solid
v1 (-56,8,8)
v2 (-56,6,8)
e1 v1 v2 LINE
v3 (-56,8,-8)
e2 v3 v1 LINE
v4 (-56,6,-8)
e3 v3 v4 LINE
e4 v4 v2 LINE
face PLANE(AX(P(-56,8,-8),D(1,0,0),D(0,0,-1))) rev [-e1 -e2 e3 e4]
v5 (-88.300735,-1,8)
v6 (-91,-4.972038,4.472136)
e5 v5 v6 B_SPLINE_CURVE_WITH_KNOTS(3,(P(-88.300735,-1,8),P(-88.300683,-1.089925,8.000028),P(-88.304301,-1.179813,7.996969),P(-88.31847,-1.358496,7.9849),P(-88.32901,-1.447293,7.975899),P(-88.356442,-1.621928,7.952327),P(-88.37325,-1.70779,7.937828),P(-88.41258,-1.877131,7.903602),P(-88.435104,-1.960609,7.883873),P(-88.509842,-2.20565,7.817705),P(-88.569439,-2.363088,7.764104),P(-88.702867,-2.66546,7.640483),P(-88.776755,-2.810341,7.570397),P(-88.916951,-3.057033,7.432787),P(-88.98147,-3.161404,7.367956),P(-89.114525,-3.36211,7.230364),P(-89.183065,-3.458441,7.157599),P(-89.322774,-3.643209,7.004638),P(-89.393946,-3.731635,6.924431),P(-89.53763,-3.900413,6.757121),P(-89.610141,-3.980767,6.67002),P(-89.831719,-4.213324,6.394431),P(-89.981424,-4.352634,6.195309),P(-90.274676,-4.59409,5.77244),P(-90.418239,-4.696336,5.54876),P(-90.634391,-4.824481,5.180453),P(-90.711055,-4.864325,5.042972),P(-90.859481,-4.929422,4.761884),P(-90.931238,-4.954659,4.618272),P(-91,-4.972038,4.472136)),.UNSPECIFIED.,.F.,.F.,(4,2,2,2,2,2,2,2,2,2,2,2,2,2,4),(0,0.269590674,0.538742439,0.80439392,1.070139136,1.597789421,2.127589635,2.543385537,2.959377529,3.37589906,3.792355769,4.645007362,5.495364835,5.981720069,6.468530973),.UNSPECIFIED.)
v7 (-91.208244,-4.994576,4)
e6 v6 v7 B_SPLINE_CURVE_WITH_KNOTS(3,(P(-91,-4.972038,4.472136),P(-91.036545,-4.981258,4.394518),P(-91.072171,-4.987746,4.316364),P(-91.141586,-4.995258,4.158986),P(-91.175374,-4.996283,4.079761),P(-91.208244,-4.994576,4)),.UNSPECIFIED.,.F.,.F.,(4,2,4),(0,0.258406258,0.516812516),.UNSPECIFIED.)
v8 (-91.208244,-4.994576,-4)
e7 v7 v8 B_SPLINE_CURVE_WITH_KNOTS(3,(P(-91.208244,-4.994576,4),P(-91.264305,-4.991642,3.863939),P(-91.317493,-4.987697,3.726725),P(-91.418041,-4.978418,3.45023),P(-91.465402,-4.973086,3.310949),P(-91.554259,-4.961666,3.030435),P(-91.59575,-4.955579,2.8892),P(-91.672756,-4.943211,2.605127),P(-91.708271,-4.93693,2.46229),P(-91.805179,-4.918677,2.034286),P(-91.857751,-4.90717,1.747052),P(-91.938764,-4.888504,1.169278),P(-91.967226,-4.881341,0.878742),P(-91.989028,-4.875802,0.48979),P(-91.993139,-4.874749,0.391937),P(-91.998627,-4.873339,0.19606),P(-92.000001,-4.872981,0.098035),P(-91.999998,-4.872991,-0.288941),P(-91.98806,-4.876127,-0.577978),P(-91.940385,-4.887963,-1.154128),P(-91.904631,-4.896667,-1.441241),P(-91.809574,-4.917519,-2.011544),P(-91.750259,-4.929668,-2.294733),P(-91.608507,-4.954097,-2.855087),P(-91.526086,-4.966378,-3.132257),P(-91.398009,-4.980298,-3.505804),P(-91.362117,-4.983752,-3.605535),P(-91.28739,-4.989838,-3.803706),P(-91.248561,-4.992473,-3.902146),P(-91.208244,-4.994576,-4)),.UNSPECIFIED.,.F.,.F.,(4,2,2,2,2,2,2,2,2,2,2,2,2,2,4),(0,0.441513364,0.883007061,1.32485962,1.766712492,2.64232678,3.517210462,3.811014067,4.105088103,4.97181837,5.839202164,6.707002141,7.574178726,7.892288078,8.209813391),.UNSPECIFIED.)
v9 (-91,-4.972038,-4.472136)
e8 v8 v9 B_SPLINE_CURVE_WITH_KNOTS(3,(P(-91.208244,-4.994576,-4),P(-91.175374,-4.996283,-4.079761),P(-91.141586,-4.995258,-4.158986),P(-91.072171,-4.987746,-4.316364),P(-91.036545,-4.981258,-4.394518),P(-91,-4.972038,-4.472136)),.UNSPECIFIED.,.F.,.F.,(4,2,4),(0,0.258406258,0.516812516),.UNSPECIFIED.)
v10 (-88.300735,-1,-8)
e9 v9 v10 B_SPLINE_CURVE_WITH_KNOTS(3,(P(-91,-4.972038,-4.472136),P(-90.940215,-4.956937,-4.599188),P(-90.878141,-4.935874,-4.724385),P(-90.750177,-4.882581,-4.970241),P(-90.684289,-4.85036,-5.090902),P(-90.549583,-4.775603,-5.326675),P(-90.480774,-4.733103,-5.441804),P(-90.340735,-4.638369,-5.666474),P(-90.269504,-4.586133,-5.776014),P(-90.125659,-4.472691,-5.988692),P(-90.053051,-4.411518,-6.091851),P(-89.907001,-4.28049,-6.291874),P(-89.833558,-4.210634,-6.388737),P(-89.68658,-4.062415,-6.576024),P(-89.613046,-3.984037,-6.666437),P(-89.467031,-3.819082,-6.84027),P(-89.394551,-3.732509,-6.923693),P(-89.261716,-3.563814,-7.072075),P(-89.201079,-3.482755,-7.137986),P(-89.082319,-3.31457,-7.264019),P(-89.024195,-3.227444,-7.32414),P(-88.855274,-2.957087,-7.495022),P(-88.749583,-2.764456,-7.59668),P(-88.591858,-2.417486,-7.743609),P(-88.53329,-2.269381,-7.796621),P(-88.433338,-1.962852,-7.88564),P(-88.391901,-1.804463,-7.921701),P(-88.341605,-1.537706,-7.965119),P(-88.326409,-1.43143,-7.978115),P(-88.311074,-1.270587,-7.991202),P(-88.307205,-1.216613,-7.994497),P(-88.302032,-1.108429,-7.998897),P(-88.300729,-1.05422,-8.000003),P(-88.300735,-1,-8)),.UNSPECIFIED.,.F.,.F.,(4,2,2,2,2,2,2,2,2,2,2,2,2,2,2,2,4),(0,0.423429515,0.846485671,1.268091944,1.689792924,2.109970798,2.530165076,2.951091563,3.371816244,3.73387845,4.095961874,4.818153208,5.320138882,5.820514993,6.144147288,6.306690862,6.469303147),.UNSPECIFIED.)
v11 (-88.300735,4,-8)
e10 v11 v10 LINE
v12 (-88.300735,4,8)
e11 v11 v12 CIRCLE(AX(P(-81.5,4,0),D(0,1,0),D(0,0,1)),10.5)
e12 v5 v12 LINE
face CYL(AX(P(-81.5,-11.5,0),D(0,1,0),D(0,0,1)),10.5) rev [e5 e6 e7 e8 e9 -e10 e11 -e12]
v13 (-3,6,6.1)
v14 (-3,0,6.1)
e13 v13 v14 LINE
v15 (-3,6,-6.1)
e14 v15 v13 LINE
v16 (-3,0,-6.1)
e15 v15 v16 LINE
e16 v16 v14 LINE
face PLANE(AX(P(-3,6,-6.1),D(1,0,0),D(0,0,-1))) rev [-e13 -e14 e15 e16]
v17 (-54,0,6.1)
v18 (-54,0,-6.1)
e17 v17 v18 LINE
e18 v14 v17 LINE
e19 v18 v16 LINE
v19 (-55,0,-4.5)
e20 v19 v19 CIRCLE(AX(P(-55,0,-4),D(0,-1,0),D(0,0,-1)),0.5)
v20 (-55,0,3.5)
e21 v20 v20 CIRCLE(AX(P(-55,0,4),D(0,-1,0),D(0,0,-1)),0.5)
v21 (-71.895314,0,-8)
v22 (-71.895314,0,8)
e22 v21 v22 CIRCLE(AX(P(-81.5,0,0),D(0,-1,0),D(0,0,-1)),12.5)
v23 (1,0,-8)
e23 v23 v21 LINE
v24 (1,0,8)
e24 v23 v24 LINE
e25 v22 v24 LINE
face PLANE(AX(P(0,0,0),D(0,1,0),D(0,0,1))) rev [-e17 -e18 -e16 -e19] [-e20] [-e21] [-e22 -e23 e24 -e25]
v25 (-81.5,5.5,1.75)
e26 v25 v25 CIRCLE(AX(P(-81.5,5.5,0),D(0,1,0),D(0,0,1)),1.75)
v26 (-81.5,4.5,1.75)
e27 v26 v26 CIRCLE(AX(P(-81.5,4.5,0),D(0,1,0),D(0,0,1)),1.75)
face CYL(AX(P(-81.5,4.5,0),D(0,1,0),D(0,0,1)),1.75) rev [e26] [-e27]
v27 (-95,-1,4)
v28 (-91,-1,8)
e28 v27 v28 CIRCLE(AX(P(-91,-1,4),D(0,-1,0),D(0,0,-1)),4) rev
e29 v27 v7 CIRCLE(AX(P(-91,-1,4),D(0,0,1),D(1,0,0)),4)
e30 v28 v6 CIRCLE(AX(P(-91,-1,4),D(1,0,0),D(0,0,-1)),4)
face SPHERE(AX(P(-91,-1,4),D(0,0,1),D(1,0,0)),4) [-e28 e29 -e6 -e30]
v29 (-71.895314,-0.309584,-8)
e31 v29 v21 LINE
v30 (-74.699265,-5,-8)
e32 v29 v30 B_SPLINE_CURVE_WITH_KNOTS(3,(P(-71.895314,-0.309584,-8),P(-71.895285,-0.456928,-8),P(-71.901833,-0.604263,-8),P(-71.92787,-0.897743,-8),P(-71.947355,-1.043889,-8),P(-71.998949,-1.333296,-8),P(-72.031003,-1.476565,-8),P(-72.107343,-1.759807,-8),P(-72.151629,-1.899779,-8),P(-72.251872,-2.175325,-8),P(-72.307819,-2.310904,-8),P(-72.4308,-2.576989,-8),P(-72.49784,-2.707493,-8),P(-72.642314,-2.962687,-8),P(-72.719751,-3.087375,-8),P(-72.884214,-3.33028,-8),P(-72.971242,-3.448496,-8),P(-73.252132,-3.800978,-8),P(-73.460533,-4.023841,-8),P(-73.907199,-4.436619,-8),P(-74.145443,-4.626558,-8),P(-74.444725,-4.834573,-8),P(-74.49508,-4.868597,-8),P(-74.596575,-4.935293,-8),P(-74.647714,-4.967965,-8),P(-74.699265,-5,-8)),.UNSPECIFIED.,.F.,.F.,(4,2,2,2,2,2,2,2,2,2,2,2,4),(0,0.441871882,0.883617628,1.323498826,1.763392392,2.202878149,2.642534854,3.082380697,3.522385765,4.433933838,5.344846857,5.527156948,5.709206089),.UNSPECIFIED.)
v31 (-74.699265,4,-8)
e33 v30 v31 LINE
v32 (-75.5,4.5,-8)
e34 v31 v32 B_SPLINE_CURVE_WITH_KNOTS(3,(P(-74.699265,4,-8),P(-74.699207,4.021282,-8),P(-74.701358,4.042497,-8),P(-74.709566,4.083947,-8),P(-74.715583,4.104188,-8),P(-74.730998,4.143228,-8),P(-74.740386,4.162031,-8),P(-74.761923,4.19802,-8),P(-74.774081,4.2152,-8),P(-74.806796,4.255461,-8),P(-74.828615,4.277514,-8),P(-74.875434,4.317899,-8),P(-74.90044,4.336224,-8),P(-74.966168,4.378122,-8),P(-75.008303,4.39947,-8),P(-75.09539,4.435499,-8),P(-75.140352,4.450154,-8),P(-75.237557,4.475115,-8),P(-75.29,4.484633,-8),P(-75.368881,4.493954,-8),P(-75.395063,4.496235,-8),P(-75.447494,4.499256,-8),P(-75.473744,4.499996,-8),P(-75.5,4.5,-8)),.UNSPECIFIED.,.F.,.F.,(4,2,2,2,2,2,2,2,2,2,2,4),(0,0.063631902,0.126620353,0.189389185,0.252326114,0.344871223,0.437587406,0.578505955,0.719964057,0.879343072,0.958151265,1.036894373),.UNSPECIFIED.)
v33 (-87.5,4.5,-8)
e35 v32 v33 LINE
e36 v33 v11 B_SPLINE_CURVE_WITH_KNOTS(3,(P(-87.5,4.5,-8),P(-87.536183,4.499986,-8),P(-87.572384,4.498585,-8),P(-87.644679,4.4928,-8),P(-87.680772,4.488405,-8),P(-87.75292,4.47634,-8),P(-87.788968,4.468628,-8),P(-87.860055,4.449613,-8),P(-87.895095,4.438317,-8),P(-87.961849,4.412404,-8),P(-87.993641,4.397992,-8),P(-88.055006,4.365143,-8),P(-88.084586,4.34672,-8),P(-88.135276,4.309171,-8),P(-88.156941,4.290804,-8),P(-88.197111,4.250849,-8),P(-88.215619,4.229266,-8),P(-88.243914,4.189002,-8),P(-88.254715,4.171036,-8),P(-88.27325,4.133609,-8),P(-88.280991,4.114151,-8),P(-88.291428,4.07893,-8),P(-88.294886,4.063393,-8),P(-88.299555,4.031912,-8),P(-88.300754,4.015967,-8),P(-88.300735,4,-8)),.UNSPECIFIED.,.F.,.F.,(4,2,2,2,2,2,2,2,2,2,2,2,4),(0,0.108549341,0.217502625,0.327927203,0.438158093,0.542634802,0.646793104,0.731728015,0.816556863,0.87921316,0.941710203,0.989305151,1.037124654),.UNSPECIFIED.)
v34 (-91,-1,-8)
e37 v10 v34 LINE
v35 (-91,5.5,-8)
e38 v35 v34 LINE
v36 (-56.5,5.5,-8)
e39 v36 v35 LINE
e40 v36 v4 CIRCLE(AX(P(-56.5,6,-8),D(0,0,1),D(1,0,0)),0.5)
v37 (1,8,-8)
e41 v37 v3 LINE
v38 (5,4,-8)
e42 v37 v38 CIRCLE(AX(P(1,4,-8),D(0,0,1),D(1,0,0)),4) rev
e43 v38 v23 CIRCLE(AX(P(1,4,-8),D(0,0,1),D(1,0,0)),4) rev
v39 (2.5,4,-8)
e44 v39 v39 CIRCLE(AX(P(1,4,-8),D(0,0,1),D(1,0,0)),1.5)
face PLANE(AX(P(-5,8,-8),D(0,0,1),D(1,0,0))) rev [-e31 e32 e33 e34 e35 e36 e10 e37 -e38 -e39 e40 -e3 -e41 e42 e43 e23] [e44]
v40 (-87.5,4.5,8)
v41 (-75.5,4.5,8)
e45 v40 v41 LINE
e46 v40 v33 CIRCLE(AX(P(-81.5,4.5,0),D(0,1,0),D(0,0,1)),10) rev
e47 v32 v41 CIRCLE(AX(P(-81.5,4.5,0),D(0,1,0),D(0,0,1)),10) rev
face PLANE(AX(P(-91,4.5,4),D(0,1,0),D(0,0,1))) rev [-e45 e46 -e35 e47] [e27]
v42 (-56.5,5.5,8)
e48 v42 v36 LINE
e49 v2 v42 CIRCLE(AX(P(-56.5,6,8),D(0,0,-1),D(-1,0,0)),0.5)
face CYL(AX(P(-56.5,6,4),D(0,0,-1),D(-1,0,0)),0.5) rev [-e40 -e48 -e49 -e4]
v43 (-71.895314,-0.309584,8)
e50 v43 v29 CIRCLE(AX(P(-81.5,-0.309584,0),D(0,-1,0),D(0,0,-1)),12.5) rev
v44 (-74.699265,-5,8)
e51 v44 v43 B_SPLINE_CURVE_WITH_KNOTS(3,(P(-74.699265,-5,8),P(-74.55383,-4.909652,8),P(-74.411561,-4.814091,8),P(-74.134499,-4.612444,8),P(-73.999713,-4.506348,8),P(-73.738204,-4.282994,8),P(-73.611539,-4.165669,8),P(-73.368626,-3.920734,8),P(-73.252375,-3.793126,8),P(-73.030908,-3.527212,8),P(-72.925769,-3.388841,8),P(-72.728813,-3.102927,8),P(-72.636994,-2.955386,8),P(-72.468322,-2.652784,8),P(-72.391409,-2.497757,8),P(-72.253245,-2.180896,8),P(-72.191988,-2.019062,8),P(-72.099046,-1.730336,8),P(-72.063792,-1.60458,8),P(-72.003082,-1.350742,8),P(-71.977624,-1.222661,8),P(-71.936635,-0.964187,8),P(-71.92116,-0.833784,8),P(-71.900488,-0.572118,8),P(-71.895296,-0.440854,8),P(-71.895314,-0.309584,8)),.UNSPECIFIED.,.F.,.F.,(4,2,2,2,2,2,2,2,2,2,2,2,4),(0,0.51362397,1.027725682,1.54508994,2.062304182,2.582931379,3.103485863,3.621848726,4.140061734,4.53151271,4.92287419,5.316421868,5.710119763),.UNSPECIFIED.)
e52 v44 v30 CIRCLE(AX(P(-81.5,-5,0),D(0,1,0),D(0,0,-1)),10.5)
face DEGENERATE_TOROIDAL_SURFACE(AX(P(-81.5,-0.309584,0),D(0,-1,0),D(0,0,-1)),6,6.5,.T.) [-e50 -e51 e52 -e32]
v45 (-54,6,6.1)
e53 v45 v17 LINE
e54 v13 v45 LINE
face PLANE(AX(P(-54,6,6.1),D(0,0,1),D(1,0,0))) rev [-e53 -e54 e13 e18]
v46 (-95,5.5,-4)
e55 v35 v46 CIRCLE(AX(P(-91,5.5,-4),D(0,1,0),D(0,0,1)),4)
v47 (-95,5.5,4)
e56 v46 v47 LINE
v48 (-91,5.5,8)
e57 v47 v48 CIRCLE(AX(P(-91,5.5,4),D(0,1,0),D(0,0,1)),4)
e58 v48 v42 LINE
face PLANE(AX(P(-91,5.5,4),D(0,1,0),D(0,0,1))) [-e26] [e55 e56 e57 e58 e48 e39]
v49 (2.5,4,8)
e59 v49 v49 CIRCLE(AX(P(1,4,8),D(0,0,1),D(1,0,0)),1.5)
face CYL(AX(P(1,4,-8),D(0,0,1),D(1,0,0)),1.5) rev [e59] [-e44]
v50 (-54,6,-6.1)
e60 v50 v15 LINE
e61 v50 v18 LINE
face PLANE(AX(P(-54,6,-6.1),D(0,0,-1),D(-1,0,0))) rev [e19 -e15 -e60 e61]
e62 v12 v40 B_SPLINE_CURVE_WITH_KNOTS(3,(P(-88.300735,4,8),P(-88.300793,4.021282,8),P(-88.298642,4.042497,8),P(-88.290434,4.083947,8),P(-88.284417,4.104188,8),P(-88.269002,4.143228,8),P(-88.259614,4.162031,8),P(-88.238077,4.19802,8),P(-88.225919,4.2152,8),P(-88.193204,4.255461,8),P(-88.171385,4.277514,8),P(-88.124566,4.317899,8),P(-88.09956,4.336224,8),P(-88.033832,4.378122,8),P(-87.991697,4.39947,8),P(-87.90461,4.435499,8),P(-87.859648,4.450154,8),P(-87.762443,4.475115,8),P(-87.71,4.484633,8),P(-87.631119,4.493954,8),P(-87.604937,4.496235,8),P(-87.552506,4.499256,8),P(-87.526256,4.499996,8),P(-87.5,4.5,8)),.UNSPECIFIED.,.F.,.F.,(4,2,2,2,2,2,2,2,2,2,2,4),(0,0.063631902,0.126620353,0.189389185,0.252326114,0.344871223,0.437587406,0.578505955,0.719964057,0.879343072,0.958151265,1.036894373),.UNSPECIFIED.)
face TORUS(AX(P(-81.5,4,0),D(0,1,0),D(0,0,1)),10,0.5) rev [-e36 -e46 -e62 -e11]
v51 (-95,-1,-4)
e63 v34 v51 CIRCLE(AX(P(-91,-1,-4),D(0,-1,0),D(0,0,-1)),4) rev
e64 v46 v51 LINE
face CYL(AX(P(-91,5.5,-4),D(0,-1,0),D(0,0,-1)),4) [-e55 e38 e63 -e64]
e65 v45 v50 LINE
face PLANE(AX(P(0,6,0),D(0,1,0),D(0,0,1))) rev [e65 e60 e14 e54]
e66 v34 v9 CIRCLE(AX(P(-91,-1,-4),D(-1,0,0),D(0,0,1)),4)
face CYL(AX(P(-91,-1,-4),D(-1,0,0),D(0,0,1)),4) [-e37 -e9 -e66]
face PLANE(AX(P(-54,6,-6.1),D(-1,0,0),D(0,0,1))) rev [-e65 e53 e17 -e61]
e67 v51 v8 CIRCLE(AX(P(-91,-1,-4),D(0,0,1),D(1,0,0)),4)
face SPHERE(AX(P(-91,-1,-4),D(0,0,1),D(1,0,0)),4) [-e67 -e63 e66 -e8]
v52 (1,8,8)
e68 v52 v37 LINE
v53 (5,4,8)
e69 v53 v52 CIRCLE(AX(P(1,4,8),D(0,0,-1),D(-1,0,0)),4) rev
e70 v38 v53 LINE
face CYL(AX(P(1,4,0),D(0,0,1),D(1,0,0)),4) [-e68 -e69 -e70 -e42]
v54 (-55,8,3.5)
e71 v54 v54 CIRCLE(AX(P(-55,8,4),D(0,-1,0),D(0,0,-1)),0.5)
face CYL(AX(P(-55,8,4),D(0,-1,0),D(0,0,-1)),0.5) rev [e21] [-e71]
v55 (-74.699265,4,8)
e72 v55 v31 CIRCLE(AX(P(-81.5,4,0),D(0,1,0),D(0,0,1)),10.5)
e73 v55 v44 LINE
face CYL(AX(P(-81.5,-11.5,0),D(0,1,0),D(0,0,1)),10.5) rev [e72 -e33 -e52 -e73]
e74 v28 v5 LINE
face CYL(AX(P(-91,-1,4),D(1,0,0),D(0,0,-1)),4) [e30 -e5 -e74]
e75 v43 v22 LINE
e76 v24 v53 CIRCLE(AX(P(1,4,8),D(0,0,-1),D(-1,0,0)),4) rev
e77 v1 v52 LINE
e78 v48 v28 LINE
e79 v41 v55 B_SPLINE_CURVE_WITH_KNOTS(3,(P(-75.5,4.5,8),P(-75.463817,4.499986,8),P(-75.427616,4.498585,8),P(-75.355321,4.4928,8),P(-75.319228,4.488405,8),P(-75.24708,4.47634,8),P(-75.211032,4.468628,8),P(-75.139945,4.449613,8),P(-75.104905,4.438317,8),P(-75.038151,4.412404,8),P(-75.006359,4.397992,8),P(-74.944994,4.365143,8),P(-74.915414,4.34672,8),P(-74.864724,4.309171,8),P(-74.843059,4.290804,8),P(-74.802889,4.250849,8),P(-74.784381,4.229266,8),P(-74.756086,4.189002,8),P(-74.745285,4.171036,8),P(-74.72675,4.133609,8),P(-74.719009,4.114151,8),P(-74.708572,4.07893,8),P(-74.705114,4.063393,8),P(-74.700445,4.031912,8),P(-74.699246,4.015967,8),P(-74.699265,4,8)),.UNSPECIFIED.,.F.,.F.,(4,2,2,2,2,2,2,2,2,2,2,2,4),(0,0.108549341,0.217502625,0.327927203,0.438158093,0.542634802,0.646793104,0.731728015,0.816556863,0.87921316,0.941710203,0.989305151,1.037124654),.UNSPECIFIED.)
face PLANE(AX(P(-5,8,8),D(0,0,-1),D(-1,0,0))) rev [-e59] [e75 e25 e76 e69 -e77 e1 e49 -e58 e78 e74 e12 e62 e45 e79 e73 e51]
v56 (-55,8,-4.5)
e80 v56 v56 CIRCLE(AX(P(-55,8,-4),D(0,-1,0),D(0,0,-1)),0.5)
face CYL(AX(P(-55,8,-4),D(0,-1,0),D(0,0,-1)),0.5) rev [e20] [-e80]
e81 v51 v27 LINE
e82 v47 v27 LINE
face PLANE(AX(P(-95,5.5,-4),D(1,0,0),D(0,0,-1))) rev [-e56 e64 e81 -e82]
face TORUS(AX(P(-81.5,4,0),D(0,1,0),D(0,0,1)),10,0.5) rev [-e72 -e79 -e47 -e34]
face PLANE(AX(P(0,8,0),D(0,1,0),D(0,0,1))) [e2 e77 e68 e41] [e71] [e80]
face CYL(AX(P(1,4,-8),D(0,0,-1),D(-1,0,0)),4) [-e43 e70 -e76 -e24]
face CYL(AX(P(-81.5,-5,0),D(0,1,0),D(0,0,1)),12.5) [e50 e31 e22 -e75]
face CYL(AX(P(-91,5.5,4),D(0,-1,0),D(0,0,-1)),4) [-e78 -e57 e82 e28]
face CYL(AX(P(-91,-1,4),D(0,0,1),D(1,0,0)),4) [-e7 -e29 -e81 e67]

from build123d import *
from build123d.topology import SkipClean

# Parameters (mm, degrees)
SKETCH1_W           = 10
SKETCH1_H           = 16
BOSS_EXTRUDE1_DEPTH = 8
FILLET1_R           = 4
SKETCH2_R           = 1.5
CUT_EXTRUDE1_DEPTH  = 16
SKETCH3_W           = 51
SKETCH3_H           = 16
BOSS_EXTRUDE2_DEPTH = 8
SKETCH4_W           = 36
SKETCH4_H           = 16
BOSS_EXTRUDE3_DEPTH = 4.5
SKETCH6_R           = 10.5
CUT_EXTRUDE6_DEPTH  = 16
SKETCH11_W          = 3
SKETCH11_H          = 16
BOSS_EXTRUDE4_DEPTH = 4.5
FILLET3_R           = 4
BOSS_EXTRUDE5_DEPTH = 1
SKETCH14_R          = 1.75
CUT_EXTRUDE7_DEPTH  = 1
BOSS_EXTRUDE6_DEPTH = 5
FILLET4_R           = 6.5
FILLET5_R           = 0.5
FILLET6_R           = 4
FILLET7_R           = 0.5
SKETCH17_W          = 51
SKETCH17_H          = 12.2
CUT_EXTRUDE9_DEPTH  = 6
SKETCH18_R          = 0.5
CUT_EXTRUDE10_DEPTH = 8


# Some blends are built 0.0001 mm under size
with BuildPart() as part:
    # Sketch1 → Boss-Extrude1 (new body)
    with BuildSketch(Plane(origin=(0, 0, 0), x_dir=(1, 0, 0), z_dir=(0, 1, 0))):
        Rectangle(SKETCH1_W, SKETCH1_H)
    extrude(amount=BOSS_EXTRUDE1_DEPTH)

    # Fillet1
    fillet1_edges = [part.edges().sort_by_distance(p)[0] for p in [
        (5, 0, 0),
        (5, 8, 0),
    ]]
    fillet(fillet1_edges, radius=FILLET1_R - 0.0001)  # a hair under: the kernel refuses the full size

    # Sketch2 → Cut-Extrude1 (cut)
    with BuildSketch(Plane.XY.offset(8)):
        with Locations((1, 4)):
            Circle(SKETCH2_R)
    extrude(amount=-CUT_EXTRUDE1_DEPTH, mode=Mode.SUBTRACT)

    # Sketch3 → Boss-Extrude2 (add)
    with BuildSketch(Plane(origin=(0, 0, 0), x_dir=(1, 0, 0), z_dir=(0, 1, 0))):
        with Locations((-30.5, 0)):
            Rectangle(SKETCH3_W, SKETCH3_H)
    extrude(amount=BOSS_EXTRUDE2_DEPTH)

    # Sketch4 → Boss-Extrude3 (add)
    with BuildSketch(Plane(origin=(0, 0, 0), x_dir=(1, 0, 0), z_dir=(0, 1, 0))):
        with Locations((-74, 0)):
            Rectangle(SKETCH4_W, SKETCH4_H)
    extrude(amount=BOSS_EXTRUDE3_DEPTH)

    # Sketch6 → Cut-Extrude6 (cut)
    with BuildSketch(Plane(origin=(0, 4.5, 0), x_dir=(1, 0, 0), z_dir=(0, 1, 0))):
        with Locations((-81.5, 0)):
            Circle(SKETCH6_R)
    extrude(amount=-CUT_EXTRUDE6_DEPTH, mode=Mode.SUBTRACT)


with BuildPart() as cut_extrude6_piece_1:
    # of the separate pieces the step leaves, piece 1, a body of its own (cut_extrude6_pieces)
    add(part.part.solids().sort_by_distance((5, 3.9999, -8))[0])



with BuildPart() as cut_extrude6_piece_2:
    # of the separate pieces the step leaves, piece 2, a body of its own (cut_extrude6_pieces)
    add(part.part.solids().sort_by_distance((-88.300735254, 4.5, 8))[0])



with BuildPart() as cut_extrude6_piece_3:
    # of the separate pieces the step leaves, piece 3, a body of its own (cut_extrude6_pieces)
    add(part.part.solids().sort_by_distance((-88.300735254, 0, -8))[0])


with BuildPart() as cut_extrude6_piece_2_1:
    add(cut_extrude6_piece_2.part)

    add(cut_extrude6_piece_3.part)  # Boss-Extrude4 merges Cut-Extrude6 piece 3
    # Sketch11 → Boss-Extrude4 (add)
    with BuildSketch(Plane(origin=(0, 0, 0), x_dir=(1, 0, 0), z_dir=(0, 1, 0))):
        with Locations((-93.5, 0)):
            Rectangle(SKETCH11_W, SKETCH11_H)
    extrude(amount=BOSS_EXTRUDE4_DEPTH)

    # Fillet3
    fillet3_edges = [cut_extrude6_piece_2_1.edges().sort_by_distance(p)[0] for p in [
        (-95, 2.25, 8),
        (-95, 2.25, -8),
    ]]
    fillet(fillet3_edges, radius=FILLET3_R)


with BuildPart() as cut_extrude6_piece_1_1:
    add(cut_extrude6_piece_1.part)

    add(cut_extrude6_piece_2_1.part)  # Boss-Extrude5 merges Cut-Extrude6 piece 2
    # Sketch13 → Boss-Extrude5 (add)
    with BuildSketch(Plane(origin=(0, 4.5, 0), x_dir=(1, 0, 0), z_dir=(0, 1, 0))):
        with BuildLine():
            Line((-88.300735254, 8), (-91, 8))
            ThreePointArc((-91, 8), (-93.828427125, 6.828427125), (-95, 4))
            Line((-95, 4), (-95, -4))
            ThreePointArc((-95, -4), (-93.828427125, -6.828427125), (-91, -8))
            Line((-91, -8), (-88.300735254, -8))
            Line((-88.300735254, -8), (-74.699264746, -8))
            Line((-74.699264746, -8), (-56, -8))
            Line((-56, -8), (-56, 8))
            Line((-56, 8), (-74.699264746, 8))
            Line((-74.699264746, 8), (-88.300735254, 8))
        make_face()
    extrude(amount=BOSS_EXTRUDE5_DEPTH)

    # Sketch14 → Cut-Extrude7 (cut)
    with BuildSketch(Plane(origin=(0, 5.5, 0), x_dir=(1, 0, 0), z_dir=(0, 1, 0))):
        with Locations(Location((-81.5, 0, 0), (0, 0, 270))):
            Circle(SKETCH14_R)
    extrude(amount=-CUT_EXTRUDE7_DEPTH, mode=Mode.SUBTRACT)

    # Sketch15 → Boss-Extrude6 (add)
    with SkipClean():  # the faces are left unmerged after this step: merging them gives an invalid solid
        with BuildSketch(Plane.XZ):
            with BuildLine():
                Line((-91, 8), (-88.300735254, 8))
                ThreePointArc((-88.300735254, 8), (-92, 0), (-88.300735254, -8))
                Line((-88.300735254, -8), (-91, -8))
                ThreePointArc((-91, -8), (-93.828427125, -6.828427125), (-95, -4))
                Line((-95, -4), (-95, 4))
                ThreePointArc((-95, 4), (-93.828427125, 6.828427125), (-91, 8))
            make_face()
            with BuildLine():
                Line((-71.895313644, 8), (-74.699264746, 8))
                ThreePointArc((-74.699264746, 8), (-71, 0), (-74.699264746, -8))
                Line((-74.699264746, -8), (-71.895313644, -8))
                ThreePointArc((-71.895313644, -8), (-69, 0), (-71.895313644, 8))
            make_face()
        extrude(amount=BOSS_EXTRUDE6_DEPTH)

    # Fillet4
    # the kernel refuses this fillet: 6.5 mm, written as the material it takes off along each edge
    with BuildSketch(Plane(origin=(-81.5, -5, 0), x_dir=(-0.06203986114443866, 0, -0.998073672445666), z_dir=(-0.998073672445666, 0, 0.06203986114443866))) as fillet4_piece_1:
        with BuildLine():
            CenterArc((6, -4.69041576), FILLET4_R, 0, 46.18693854)
            Line((10.5, 0), (12.5, 0))
            Line((12.5, 0), (12.5, -4.69041576))
        make_face()
    revolve(axis=Axis((-81.5, -5, 0), (0, -1, 0)), revolution_arc=187.113812842, mode=Mode.SUBTRACT)

    # Fillet5
    fillet5_edges = [cut_extrude6_piece_1_1.edges().sort_by_distance(p)[0] for p in [
        (-71, 4.5, 0),
        (-92, 4.5, 0),
    ]]
    fillet(fillet5_edges, radius=FILLET5_R)

    # Fillet6
    # the kernel refuses this fillet: 4 mm, written as the material it takes off along each edge
    with BuildSketch(Plane(origin=(-91, -5, 8), x_dir=(0, 0, -1), z_dir=(1, 0, 0))) as fillet6_piece_1:
        with BuildLine():
            CenterArc((FILLET6_R, FILLET6_R), FILLET6_R, 180, 90)
            Line((0, FILLET6_R), (0, 0))
            Line((0, 0), (FILLET6_R, 0))
        make_face()
    extrude(amount=12.699264746, mode=Mode.SUBTRACT)
    with BuildSketch(Plane(origin=(-91, -5, 4), x_dir=(-1, 0, 0), z_dir=(0, 0, -1))) as fillet6_piece_2:
        with BuildLine():
            CenterArc((4 - FILLET6_R, FILLET6_R), FILLET6_R, 270, 90)
            Line((4, FILLET6_R), (4, 0))
            Line((4, 0), (4 - FILLET6_R, 0))
        make_face()
    revolve(axis=Axis((-91, -5, 4), (0, 1, 0)), revolution_arc=90, mode=Mode.SUBTRACT)
    with BuildSketch(Plane(origin=(-78.300735254, -5, -8), x_dir=(0, 1, 0), z_dir=(-1, 0, 0))) as fillet6_piece_3:
        with BuildLine():
            CenterArc((FILLET6_R, -FILLET6_R), FILLET6_R, 90, 90)
            Line((0, -FILLET6_R), (0, 0))
            Line((0, 0), (FILLET6_R, 0))
        make_face()
    extrude(amount=12.699264746, mode=Mode.SUBTRACT)
    with BuildSketch(Plane(origin=(-91, -5, -4), x_dir=(0, 0, -1), z_dir=(1, 0, 0))) as fillet6_piece_4:
        with BuildLine():
            CenterArc((4 - FILLET6_R, FILLET6_R), FILLET6_R, 270, 90)
            Line((4, FILLET6_R), (4, 0))
            Line((4, 0), (4 - FILLET6_R, 0))
        make_face()
    revolve(axis=Axis((-91, -5, -4), (0, 1, 0)), revolution_arc=90, mode=Mode.SUBTRACT)
    with BuildSketch(Plane(origin=(-95, -5, -4), x_dir=(1, 0, 0), z_dir=(0, 0, 1))) as fillet6_piece_5:
        with BuildLine():
            CenterArc((FILLET6_R, FILLET6_R), FILLET6_R, 180, 90)
            Line((0, FILLET6_R), (0, 0))
            Line((0, 0), (FILLET6_R, 0))
        make_face()
    extrude(amount=8, mode=Mode.SUBTRACT)

    # Fillet7
    fillet7_edges = [cut_extrude6_piece_1_1.edges().sort_by_distance(p)[0] for p in [
        (-56, 5.5, 0),
    ]]
    fillet(fillet7_edges, radius=FILLET7_R)

    # Sketch17 → Cut-Extrude9 (cut)
    with BuildSketch(Plane.XZ):
        with Locations((-28.5, 0)):
            Rectangle(SKETCH17_W, SKETCH17_H)
    extrude(amount=-CUT_EXTRUDE9_DEPTH, mode=Mode.SUBTRACT)

    # Sketch18 → Cut-Extrude10 (cut)
    with BuildSketch(Plane.XZ):
        with Locations(Location((-55, 4, 0), (0, 0, 270))):
            Circle(SKETCH18_R)
        with Locations(Location((-55, -4, 0), (0, 0, 270))):
            Circle(SKETCH18_R)
    extrude(amount=-CUT_EXTRUDE10_DEPTH, mode=Mode.SUBTRACT)


solid = cut_extrude6_piece_1_1.part
